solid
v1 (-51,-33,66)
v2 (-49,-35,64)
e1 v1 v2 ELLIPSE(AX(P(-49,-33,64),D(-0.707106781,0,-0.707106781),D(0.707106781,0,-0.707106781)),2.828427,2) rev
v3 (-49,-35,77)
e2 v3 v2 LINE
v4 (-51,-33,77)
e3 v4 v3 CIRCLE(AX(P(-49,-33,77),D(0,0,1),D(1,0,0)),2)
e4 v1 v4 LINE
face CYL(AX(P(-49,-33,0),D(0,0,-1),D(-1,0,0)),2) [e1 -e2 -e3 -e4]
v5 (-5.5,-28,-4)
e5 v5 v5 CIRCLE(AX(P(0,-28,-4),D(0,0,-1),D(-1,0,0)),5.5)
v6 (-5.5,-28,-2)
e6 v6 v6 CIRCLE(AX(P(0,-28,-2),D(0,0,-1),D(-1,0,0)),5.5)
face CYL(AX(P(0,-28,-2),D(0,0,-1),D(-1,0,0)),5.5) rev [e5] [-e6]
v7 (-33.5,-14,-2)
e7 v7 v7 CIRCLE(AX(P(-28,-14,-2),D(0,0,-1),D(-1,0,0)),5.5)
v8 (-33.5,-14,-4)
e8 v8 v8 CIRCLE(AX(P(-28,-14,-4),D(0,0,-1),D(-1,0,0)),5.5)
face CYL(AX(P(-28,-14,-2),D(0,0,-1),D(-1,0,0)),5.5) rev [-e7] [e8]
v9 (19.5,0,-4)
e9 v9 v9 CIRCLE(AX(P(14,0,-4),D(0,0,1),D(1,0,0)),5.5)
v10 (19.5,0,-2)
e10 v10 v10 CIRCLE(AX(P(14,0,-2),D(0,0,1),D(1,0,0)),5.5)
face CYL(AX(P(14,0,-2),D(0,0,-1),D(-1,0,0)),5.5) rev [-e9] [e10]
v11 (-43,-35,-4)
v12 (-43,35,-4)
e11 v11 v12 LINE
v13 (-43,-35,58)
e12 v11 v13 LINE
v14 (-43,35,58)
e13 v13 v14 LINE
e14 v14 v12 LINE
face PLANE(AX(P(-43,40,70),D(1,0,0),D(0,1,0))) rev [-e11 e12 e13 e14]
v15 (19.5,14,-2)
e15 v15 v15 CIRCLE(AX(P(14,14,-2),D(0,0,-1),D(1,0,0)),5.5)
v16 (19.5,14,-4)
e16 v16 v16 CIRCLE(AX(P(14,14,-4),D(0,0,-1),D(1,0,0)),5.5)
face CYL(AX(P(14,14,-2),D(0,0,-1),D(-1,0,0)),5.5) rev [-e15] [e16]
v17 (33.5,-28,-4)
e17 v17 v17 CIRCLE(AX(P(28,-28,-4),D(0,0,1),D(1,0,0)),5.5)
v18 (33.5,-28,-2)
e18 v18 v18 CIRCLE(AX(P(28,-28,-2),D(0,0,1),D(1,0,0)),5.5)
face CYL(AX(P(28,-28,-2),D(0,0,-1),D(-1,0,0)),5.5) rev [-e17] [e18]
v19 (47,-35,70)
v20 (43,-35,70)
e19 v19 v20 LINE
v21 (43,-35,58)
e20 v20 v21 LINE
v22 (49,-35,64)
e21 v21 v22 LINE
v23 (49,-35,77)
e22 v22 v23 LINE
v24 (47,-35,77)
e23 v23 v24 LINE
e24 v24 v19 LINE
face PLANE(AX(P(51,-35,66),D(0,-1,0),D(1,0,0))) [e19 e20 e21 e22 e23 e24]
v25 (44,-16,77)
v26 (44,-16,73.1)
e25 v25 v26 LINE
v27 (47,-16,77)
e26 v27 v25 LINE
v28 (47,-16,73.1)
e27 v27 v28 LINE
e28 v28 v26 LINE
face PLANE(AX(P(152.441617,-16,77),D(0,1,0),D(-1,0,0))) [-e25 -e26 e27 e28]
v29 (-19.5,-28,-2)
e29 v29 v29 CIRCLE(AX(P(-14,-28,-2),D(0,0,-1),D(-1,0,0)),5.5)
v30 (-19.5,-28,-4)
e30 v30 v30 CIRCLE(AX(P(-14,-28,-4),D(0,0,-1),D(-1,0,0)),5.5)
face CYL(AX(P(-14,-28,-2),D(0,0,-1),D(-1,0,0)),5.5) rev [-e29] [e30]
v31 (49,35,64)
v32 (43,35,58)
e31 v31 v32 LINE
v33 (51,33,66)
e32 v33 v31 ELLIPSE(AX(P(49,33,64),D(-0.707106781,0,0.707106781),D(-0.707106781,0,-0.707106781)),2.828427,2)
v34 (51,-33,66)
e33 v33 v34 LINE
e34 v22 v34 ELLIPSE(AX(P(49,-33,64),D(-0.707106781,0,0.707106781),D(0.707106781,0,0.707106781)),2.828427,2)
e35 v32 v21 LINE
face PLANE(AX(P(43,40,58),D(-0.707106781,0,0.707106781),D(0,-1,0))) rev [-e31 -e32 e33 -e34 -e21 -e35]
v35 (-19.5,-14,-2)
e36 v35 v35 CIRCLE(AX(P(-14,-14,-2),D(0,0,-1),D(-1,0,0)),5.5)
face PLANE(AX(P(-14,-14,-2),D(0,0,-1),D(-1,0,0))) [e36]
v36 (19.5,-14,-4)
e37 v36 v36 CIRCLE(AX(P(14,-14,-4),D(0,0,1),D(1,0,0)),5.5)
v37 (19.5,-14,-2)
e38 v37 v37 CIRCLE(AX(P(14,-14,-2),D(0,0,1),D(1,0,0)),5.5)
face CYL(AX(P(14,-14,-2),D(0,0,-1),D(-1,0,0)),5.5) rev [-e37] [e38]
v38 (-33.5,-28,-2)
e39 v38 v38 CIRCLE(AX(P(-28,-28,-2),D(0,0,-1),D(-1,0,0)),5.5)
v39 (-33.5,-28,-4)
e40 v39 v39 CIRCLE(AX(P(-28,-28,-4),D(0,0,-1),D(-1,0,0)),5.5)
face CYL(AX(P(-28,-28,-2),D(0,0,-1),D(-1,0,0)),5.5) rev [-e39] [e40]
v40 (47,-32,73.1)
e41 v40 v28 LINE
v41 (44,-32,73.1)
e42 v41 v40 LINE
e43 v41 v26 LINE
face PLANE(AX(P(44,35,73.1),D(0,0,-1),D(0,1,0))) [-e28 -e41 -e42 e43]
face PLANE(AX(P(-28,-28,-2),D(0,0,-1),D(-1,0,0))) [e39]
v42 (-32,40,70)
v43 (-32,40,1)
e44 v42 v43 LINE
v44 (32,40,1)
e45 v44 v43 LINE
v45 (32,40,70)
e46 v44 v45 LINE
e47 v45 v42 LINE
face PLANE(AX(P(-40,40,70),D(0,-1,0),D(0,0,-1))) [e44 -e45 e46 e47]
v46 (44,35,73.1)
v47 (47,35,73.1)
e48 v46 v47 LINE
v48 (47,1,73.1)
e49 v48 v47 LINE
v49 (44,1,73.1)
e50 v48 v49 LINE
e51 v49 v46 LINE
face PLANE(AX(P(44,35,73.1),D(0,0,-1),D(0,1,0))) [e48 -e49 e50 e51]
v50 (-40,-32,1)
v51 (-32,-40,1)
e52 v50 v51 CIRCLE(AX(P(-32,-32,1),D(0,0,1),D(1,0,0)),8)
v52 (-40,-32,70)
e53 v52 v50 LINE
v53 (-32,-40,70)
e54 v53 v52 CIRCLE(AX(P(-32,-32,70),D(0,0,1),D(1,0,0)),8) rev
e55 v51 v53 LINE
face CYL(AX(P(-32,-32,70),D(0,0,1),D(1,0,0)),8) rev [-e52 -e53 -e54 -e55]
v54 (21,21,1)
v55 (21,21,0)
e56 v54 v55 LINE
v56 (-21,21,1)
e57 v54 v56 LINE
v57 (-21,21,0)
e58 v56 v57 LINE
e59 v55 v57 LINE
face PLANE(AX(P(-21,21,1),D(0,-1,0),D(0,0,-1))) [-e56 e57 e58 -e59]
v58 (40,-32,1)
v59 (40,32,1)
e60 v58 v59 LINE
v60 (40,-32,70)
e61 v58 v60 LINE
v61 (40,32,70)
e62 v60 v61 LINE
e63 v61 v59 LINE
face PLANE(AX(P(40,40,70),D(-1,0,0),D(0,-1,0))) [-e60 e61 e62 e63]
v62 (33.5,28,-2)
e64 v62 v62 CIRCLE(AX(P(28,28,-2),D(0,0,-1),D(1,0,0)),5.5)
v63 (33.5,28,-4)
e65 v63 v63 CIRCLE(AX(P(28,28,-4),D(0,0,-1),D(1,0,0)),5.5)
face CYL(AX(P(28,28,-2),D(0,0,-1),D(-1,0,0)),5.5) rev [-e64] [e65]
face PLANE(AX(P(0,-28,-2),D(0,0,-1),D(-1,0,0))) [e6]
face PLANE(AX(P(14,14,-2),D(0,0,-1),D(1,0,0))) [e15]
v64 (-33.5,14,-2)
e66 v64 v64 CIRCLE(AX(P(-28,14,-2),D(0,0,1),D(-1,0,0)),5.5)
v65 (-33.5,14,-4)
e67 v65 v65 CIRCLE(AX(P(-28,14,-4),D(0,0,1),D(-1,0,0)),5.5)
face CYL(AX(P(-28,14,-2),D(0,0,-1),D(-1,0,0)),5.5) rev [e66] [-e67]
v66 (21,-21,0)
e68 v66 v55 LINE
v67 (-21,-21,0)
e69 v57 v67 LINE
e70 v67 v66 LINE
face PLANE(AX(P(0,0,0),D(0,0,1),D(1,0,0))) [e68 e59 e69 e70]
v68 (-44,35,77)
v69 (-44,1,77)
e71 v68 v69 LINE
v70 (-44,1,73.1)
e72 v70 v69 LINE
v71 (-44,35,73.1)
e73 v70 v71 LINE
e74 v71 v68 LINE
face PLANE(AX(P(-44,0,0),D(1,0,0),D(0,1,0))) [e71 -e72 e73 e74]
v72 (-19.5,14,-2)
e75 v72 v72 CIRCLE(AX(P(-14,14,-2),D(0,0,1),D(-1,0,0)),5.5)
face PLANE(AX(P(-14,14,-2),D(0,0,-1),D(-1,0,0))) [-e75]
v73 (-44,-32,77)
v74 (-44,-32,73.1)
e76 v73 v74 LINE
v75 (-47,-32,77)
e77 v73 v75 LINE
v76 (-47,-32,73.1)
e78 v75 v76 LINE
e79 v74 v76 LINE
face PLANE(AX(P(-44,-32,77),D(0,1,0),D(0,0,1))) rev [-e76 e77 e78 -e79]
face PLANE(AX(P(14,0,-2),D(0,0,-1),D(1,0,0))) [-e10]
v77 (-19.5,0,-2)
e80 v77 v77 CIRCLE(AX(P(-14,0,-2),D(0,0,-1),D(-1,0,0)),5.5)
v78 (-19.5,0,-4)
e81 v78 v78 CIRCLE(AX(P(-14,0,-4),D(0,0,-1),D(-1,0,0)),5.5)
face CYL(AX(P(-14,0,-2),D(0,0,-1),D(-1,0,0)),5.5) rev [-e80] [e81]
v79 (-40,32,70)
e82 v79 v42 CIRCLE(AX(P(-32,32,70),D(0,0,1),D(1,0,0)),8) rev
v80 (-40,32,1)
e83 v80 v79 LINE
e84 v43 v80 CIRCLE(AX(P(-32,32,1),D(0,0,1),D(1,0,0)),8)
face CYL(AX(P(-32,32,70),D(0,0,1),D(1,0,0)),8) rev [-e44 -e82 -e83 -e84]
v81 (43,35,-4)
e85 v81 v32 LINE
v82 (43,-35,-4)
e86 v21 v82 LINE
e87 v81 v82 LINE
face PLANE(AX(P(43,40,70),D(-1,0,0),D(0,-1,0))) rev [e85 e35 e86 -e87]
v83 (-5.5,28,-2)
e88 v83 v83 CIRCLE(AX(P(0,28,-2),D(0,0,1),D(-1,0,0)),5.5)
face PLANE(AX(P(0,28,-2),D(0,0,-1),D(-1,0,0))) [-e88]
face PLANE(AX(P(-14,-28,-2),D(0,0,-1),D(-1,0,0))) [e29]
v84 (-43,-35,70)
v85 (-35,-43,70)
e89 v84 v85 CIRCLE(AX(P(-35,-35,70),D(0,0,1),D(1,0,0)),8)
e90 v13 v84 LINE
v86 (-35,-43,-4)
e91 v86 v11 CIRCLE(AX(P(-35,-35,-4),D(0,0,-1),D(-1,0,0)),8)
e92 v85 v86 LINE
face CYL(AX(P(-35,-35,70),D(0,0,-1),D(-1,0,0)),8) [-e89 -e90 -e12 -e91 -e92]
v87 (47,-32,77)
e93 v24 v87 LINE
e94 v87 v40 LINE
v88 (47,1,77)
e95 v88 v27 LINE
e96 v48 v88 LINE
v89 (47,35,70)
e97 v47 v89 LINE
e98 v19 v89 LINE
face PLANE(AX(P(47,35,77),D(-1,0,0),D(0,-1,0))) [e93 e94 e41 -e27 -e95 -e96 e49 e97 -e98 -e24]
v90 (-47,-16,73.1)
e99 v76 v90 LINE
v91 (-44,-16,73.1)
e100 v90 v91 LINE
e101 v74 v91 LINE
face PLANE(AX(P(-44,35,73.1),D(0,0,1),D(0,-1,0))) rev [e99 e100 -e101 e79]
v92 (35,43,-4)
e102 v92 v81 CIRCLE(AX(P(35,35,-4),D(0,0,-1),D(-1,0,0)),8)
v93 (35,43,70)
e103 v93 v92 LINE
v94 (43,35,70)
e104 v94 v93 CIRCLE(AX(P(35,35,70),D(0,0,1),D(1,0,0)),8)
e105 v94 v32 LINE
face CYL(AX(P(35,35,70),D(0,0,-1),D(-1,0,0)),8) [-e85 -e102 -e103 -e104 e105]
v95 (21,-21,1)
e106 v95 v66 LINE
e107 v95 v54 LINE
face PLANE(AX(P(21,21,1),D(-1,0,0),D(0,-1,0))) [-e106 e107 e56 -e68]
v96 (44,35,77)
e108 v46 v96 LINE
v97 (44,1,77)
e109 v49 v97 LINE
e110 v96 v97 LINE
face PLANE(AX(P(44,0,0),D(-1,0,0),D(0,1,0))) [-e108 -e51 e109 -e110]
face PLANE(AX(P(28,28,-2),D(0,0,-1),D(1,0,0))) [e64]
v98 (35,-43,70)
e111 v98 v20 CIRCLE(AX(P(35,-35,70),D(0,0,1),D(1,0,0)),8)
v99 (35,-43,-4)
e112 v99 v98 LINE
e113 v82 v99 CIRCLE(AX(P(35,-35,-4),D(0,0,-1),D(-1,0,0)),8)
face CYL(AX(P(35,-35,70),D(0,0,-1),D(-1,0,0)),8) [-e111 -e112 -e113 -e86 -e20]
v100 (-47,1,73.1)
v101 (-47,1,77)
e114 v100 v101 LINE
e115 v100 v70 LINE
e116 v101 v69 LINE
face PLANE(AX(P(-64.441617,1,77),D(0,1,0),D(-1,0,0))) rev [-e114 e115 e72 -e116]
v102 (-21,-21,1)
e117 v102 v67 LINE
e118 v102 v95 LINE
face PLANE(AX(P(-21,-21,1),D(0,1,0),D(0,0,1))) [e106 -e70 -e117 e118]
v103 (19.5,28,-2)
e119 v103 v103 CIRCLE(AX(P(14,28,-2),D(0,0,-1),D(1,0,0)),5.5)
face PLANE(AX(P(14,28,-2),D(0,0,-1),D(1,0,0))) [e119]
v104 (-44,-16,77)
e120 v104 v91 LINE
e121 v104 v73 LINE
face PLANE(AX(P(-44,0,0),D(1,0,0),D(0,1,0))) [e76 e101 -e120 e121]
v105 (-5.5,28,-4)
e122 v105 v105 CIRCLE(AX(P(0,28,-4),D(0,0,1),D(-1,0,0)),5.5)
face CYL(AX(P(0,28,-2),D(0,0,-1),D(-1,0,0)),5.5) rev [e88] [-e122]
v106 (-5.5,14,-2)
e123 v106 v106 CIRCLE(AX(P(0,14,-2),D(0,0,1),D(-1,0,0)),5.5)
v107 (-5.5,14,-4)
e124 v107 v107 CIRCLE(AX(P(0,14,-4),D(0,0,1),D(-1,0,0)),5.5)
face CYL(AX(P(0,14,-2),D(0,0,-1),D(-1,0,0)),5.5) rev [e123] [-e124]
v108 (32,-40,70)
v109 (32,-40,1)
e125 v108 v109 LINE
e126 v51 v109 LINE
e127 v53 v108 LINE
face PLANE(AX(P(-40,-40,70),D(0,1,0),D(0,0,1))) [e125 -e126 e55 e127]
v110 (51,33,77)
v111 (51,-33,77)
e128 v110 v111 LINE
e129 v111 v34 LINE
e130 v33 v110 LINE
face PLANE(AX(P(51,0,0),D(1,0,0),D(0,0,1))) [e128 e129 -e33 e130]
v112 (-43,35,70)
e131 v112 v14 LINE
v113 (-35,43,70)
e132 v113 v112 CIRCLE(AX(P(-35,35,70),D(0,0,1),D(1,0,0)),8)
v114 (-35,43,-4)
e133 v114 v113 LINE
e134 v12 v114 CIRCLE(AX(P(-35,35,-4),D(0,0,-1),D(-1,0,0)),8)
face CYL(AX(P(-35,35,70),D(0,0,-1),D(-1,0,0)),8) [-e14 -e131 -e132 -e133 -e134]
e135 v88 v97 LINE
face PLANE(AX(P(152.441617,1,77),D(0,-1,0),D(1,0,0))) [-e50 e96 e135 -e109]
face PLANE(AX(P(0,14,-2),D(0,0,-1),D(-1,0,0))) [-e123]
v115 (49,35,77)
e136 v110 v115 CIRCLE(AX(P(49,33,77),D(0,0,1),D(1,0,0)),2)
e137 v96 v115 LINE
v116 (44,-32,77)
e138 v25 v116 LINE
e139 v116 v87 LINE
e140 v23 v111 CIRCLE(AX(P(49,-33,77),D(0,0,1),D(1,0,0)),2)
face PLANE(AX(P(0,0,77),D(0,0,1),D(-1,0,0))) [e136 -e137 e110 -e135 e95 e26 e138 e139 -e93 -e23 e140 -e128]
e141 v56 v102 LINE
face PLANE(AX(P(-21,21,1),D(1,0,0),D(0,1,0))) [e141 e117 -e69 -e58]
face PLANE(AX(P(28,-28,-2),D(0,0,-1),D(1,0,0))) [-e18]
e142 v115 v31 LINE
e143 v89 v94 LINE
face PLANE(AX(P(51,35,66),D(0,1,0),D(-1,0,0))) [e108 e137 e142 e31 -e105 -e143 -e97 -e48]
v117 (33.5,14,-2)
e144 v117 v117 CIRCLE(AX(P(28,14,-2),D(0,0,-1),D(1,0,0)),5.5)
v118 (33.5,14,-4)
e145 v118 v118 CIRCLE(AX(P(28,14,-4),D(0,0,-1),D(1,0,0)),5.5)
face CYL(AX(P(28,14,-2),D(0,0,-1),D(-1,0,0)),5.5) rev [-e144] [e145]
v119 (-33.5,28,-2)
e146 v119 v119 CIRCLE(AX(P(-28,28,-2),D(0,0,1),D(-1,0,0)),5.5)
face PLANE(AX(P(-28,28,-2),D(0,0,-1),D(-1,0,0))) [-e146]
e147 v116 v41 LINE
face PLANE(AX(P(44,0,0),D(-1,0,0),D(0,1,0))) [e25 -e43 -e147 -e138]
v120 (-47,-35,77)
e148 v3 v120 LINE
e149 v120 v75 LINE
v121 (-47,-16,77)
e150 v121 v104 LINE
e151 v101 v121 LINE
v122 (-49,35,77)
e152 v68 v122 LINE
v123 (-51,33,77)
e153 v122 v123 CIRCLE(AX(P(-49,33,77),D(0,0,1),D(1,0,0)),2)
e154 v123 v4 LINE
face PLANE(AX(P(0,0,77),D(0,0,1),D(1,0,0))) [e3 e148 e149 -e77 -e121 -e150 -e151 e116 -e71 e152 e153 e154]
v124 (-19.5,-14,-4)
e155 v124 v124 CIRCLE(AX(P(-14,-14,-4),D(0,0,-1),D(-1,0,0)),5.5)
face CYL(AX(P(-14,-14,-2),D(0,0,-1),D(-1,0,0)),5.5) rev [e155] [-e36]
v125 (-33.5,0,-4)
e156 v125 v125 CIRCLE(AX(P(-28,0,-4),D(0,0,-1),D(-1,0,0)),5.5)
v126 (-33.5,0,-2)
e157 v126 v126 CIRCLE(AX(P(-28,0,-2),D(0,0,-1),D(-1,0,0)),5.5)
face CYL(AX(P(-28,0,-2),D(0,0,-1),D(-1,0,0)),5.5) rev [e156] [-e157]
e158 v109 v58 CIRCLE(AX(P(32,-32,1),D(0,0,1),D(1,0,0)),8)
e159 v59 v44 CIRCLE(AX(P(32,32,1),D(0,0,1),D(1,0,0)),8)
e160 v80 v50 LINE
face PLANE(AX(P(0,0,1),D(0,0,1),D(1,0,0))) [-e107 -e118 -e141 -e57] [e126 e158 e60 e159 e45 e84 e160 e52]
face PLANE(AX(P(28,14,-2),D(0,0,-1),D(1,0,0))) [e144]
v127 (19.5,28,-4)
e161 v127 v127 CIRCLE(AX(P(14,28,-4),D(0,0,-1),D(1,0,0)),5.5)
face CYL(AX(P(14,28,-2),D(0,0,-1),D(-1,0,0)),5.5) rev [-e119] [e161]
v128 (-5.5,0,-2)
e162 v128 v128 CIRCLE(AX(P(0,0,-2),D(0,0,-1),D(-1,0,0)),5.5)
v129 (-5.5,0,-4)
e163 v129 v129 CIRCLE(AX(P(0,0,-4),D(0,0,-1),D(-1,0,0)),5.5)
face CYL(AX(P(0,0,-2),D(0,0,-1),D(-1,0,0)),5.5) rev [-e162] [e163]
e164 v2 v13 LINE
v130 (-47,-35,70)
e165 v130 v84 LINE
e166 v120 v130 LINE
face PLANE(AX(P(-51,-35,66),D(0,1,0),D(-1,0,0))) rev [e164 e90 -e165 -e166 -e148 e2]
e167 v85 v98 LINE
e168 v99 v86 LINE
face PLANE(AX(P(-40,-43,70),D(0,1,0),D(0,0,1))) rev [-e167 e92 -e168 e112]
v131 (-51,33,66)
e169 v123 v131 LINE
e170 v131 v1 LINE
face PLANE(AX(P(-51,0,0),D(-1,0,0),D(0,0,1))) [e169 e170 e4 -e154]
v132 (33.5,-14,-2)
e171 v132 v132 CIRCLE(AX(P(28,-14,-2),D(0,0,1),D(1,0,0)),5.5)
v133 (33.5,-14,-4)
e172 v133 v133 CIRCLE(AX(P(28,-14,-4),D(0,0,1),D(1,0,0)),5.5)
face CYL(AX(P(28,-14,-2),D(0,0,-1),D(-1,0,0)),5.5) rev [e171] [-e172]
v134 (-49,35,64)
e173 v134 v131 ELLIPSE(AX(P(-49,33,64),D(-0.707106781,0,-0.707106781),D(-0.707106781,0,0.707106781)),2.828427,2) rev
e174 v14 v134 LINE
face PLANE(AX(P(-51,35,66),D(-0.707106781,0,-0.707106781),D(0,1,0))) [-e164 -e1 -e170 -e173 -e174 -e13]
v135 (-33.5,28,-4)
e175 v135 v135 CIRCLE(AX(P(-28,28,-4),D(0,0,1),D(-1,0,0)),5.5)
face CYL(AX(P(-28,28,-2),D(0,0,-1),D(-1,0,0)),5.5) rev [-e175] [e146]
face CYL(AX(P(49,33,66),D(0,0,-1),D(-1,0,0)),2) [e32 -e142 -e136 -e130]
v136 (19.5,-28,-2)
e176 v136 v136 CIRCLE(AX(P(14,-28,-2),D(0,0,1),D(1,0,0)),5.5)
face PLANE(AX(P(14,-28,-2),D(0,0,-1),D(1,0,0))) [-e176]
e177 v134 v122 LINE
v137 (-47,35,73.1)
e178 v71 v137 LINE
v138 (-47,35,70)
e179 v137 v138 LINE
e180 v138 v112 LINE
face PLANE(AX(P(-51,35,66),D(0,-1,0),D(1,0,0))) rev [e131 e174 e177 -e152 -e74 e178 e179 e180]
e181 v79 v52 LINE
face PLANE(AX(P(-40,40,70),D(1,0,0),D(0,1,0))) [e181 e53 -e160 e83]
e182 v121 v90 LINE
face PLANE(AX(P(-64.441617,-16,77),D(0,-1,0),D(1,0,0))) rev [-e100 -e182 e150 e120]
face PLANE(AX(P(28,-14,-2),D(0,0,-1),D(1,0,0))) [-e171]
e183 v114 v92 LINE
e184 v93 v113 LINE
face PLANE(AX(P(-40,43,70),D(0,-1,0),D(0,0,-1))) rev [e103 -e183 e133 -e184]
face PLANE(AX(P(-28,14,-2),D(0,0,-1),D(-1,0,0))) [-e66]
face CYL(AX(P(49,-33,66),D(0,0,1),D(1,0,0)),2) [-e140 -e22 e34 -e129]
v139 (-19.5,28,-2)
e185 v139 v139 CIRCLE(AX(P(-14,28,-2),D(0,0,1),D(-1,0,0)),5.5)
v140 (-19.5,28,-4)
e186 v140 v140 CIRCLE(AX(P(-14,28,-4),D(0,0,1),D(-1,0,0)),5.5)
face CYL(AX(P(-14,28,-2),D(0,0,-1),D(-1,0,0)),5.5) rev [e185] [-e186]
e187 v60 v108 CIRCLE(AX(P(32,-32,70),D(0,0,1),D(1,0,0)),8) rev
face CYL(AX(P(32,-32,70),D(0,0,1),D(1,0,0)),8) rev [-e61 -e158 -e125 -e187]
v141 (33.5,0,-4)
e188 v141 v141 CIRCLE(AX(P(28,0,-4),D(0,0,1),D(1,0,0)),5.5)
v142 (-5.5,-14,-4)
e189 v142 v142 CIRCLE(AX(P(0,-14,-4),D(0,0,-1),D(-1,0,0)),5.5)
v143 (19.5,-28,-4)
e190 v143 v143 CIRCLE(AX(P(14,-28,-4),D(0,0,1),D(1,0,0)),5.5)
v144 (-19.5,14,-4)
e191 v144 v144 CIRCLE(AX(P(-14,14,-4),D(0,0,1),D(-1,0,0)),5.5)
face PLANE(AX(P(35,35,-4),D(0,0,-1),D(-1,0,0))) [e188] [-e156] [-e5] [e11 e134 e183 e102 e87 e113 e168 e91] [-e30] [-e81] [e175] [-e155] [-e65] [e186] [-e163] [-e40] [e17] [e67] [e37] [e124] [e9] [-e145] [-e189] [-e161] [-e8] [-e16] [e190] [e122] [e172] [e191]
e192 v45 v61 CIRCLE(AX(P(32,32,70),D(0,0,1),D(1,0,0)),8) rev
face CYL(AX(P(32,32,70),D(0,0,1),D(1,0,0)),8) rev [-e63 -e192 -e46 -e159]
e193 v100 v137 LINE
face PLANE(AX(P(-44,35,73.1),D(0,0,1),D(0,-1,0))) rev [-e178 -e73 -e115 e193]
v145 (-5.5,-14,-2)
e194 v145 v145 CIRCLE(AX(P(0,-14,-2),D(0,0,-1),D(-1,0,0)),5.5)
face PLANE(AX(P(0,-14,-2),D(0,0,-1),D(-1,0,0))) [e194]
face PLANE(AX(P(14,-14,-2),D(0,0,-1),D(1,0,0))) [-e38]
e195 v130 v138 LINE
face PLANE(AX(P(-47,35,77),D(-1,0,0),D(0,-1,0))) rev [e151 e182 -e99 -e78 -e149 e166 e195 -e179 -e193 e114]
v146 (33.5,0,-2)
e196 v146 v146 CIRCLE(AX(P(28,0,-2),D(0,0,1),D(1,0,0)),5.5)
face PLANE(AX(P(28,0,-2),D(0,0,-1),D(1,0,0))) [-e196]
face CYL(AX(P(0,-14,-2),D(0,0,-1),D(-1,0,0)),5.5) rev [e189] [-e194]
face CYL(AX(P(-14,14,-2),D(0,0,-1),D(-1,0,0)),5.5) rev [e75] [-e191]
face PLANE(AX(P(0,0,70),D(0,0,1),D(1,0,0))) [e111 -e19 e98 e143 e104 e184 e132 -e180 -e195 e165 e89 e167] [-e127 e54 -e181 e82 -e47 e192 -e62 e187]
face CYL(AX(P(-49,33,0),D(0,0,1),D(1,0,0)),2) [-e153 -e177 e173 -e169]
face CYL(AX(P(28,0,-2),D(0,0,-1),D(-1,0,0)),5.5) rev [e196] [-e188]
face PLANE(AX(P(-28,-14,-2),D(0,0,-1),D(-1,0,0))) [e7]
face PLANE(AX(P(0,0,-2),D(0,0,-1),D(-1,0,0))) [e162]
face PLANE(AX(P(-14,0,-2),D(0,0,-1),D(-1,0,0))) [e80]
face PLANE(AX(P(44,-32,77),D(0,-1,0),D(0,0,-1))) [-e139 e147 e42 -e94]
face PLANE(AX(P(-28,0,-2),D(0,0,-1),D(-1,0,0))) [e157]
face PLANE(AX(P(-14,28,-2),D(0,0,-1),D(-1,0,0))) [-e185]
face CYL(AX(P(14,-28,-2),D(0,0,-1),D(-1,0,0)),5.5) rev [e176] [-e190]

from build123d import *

# Parameters (mm, degrees)
SKETCH_1_W                  = 80
SKETCH_1_H                  = 80
EXTRUDE_1_DEPTH             = 70
SHELL_1_T                   = 3
SKETCH_2_W                  = 80
SKETCH_2_H                  = 80
SKETCH_2_W_2                = 42
SKETCH_2_H_2                = 42
EXTRUDE_2_DEPTH             = 1
FILLET_1_R                  = 8
SKETCH_3_W                  = 4
SKETCH_3_H                  = 70
EXTRUDE_3_DEPTH             = 8
SKETCH_4_W                  = 4
SKETCH_4_H                  = 70
EXTRUDE_4_DEPTH             = 7
SKETCH_5_W                  = 3.9
SKETCH_5_H                  = 67
EXTRUDE_5_DEPTH             = 3
SKETCH_8_W                  = 3.9
SKETCH_8_H                  = 17
CUT_EXTRUDE_2_DEPTH         = 3
FILLET_2_R                  = 2
CHAMFER_START               = -35
CHAMFER_1_DEPTH             = 70
CHAMFER_START_2             = 63
CHAMFER_1_2_DEPTH           = 3
EXTRUDE_START               = 1
EXTRUDE_6_DEPTH             = 1
SKETCH_7_R                  = 5.5
CUT_EXTRUDE_1_DEPTH         = 2
PATTERN_LINEAR_1_COUNT      = 3
PATTERN_LINEAR_1_PITCH      = 14
PATTERN_LINEAR_1_COUNT_DIR2 = 3
PATTERN_LINEAR_1_PITCH_DIR2 = 14
MIRROR_2_COPY_1_SKETCH_R    = 5.5
MIRROR_2_COPY_1_DEPTH       = 2
MIRROR_2_COPY_2_SKETCH_R    = 5.5
MIRROR_2_COPY_2_DEPTH       = 2
MIRROR_2_COPY_3_SKETCH_R    = 5.5
MIRROR_2_COPY_3_DEPTH       = 2
MIRROR_2_COPY_4_SKETCH_R    = 5.5
MIRROR_2_COPY_4_DEPTH       = 2
MIRROR_2_COPY_5_SKETCH_R    = 5.5
MIRROR_2_COPY_5_DEPTH       = 2
MIRROR_2_COPY_6_SKETCH_R    = 5.5
MIRROR_2_COPY_6_DEPTH       = 2
MIRROR_2_COPY_7_SKETCH_R    = 5.5
MIRROR_2_COPY_7_DEPTH       = 2
MIRROR_2_COPY_8_SKETCH_R    = 5.5
MIRROR_2_COPY_8_DEPTH       = 2
MIRROR_2_COPY_9_SKETCH_R    = 5.5
MIRROR_2_COPY_9_DEPTH       = 2
MIRROR_3_COPY_1_SKETCH_R    = 5.5
MIRROR_3_COPY_1_DEPTH       = 2
MIRROR_3_COPY_2_SKETCH_R    = 5.5
MIRROR_3_COPY_2_DEPTH       = 2
MIRROR_3_COPY_3_SKETCH_R    = 5.5
MIRROR_3_COPY_3_DEPTH       = 2
MIRROR_3_COPY_4_SKETCH_R    = 5.5
MIRROR_3_COPY_4_DEPTH       = 2
MIRROR_3_COPY_5_SKETCH_R    = 5.5
MIRROR_3_COPY_5_DEPTH       = 2
MIRROR_3_COPY_6_SKETCH_R    = 5.5
MIRROR_3_COPY_6_DEPTH       = 2
MIRROR_3_COPY_7_SKETCH_R    = 5.5
MIRROR_3_COPY_7_DEPTH       = 2
MIRROR_3_COPY_8_SKETCH_R    = 5.5
MIRROR_3_COPY_8_DEPTH       = 2
MIRROR_3_COPY_9_SKETCH_R    = 5.5
MIRROR_3_COPY_9_DEPTH       = 2
MIRROR_3_COPY_10_SKETCH_R   = 5.5
MIRROR_3_COPY_10_DEPTH      = 2
MIRROR_3_COPY_11_SKETCH_R   = 5.5
MIRROR_3_COPY_11_DEPTH      = 2
MIRROR_3_COPY_12_SKETCH_R   = 5.5
MIRROR_3_COPY_12_DEPTH      = 2
MIRROR_3_COPY_13_SKETCH_R   = 5.5
MIRROR_3_COPY_13_DEPTH      = 2
MIRROR_3_COPY_14_SKETCH_R   = 5.5
MIRROR_3_COPY_14_DEPTH      = 2
MIRROR_3_COPY_15_SKETCH_R   = 5.5
MIRROR_3_COPY_15_DEPTH      = 2
MIRROR_3_COPY_16_SKETCH_R   = 5.5
MIRROR_3_COPY_16_DEPTH      = 2
MIRROR_3_COPY_17_SKETCH_R   = 5.5
MIRROR_3_COPY_17_DEPTH      = 2
MIRROR_3_COPY_18_SKETCH_R   = 5.5
MIRROR_3_COPY_18_DEPTH      = 2
MIRROR_3_COPY_19_SKETCH_R   = 5.5
MIRROR_3_COPY_19_DEPTH      = 2


with BuildPart() as part:
    # 草图1 → 凸台-拉伸1 (new body)
    with BuildSketch(Plane.XY):
        Rectangle(SKETCH_1_W, SKETCH_1_H)
    extrude(amount=EXTRUDE_1_DEPTH)

    # 抽壳1
    shell_1_openings = [part.faces().sort_by_distance(p)[0] for p in [
        (0, 0, 70),
    ]]
    offset(amount=SHELL_1_T, openings=shell_1_openings, kind=Kind.INTERSECTION)

    # 草图2 → 凸台-拉伸2 (add)
    with BuildSketch(Plane.XY):
        Rectangle(SKETCH_2_W, SKETCH_2_H)
        Rectangle(SKETCH_2_W_2, SKETCH_2_H_2, mode=Mode.SUBTRACT)
    extrude(amount=EXTRUDE_2_DEPTH)

    # 圆角1
    fillet_1_edges = [part.edges().sort_by_distance(p)[0] for p in [
        (40, -40, 35.5),
        (40, 40, 35.5),
        (-40, 40, 35.5),
        (-40, -40, 35.5),
        (43, -43, 33.5),
        (-43, -43, 33.5),
        (-43, 43, 33.5),
        (43, 43, 33.5),
    ]]
    fillet(fillet_1_edges, radius=FILLET_1_R)

    # 草图3 → 凸台-拉伸3 (add)
    with BuildSketch(Plane.ZY.offset(43)):
        with Locations((68, 0)):
            Rectangle(SKETCH_3_W, SKETCH_3_H)
    extrude_3 = extrude(amount=EXTRUDE_3_DEPTH)

    # 草图4 → 凸台-拉伸4 (add)
    with BuildSketch(Plane.XY.offset(70)):
        with Locations((-49, 0)):
            Rectangle(SKETCH_4_W, SKETCH_4_H)
    extrude_4 = extrude(amount=EXTRUDE_4_DEPTH)

    # 草图5 → 凸台-拉伸5 (add)
    with BuildSketch(Plane(origin=(-47, 0, 0), x_dir=(0, 0, -1), z_dir=(1, 0, 0))):
        with Locations((-75.05, 1.5)):
            Rectangle(SKETCH_5_W, SKETCH_5_H)
    extrude_5 = extrude(amount=EXTRUDE_5_DEPTH)

    # 草图8 → 切除-拉伸2 (cut)
    with BuildSketch(Plane(origin=(-44, 0, 0), x_dir=(0, 0, -1), z_dir=(1, 0, 0))):
        with Locations((-75.05, -7.5)):
            Rectangle(SKETCH_8_W, SKETCH_8_H)
    cut_extrude_2 = extrude(amount=-CUT_EXTRUDE_2_DEPTH, mode=Mode.SUBTRACT)

    # 镜向1: 凸台-拉伸3, 凸台-拉伸4, 凸台-拉伸5, 切除-拉伸2 across plane
    add(extrude_3.mirror(Plane(origin=(0, 0, 0), x_dir=(0, 0, 1), z_dir=(1, 0, 0))))
    add(extrude_4.mirror(Plane(origin=(0, 0, 0), x_dir=(0, 0, 1), z_dir=(1, 0, 0))))
    add(extrude_5.mirror(Plane(origin=(0, 0, 0), x_dir=(0, 0, 1), z_dir=(1, 0, 0))))
    add(cut_extrude_2.mirror(Plane(origin=(0, 0, 0), x_dir=(0, 0, 1), z_dir=(1, 0, 0))), mode=Mode.SUBTRACT)

    # 圆角2
    fillet_2_edges = [part.edges().sort_by_distance(p)[0] for p in [
        (-51, -35, 71.5),
        (-51, 35, 71.5),
        (51, 35, 71.5),
        (51, -35, 71.5),
    ]]
    fillet(fillet_2_edges, radius=FILLET_2_R)

    # 倒角1: read off the stored shape, not the designer's step
    # 倒角1 outline → 倒角1 (add)
    with BuildSketch(Plane(origin=(0, 0, 0), x_dir=(1, 0, 0), z_dir=(0, 1, 0)).offset(CHAMFER_START)):
        Polygon((51, -66), (43, -58), (43, -66), align=None)
        Polygon((-43, -66), (-43, -58), (-51, -66), align=None)
    extrude(amount=CHAMFER_1_DEPTH)

    # Chamfer 1 2 outline → Chamfer 1 2 (cut)
    with BuildSketch(Plane.XY.offset(CHAMFER_START_2)):
        with BuildLine():
            Line((51.000000043, 35.000000063), (49, 35))
            ThreePointArc((49, 35), (50.414213562, 34.414213562), (51, 33))
            Line((51, 33), (51.000000043, 35.000000063))
        make_face()
        with BuildLine():
            ThreePointArc((-51, 33), (-50.414213562, 34.414213562), (-49, 35))
            Line((-49, 35), (-51.000000043, 35.000000063))
            Line((-51.000000043, 35.000000063), (-51, 33))
        make_face()
        with BuildLine():
            Line((51.000000043, -35.000000063), (51, -33))
            ThreePointArc((51, -33), (50.414213562, -34.414213562), (49, -35))
            Line((49, -35), (51.000000043, -35.000000063))
        make_face()
        with BuildLine():
            ThreePointArc((-49, -35), (-50.414213562, -34.414213562), (-51, -33))
            Line((-51, -33), (-51.000000043, -35.000000063))
            Line((-51.000000043, -35.000000063), (-49, -35))
        make_face()
    extrude(amount=CHAMFER_1_2_DEPTH, mode=Mode.SUBTRACT)

    # 草图6 → 凸台-拉伸6 (add)
    with BuildSketch(Plane(origin=(0, 0, -3), x_dir=(-1, 0, 0), z_dir=(0, 0, -1)).offset(EXTRUDE_START)):
        with BuildLine():
            Line((-43, 35), (-43, -35))
            ThreePointArc((-43, -35), (-40.656854249, -40.656854249), (-35, -43))
            Line((-35, -43), (35, -43))
            ThreePointArc((35, -43), (40.656854249, -40.656854249), (43, -35))
            Line((43, -35), (43, 35))
            ThreePointArc((43, 35), (40.656854249, 40.656854249), (35, 43))
            Line((35, 43), (-35, 43))
            ThreePointArc((-35, 43), (-40.656854249, 40.656854249), (-43, 35))
        make_face()
    extrude(amount=-EXTRUDE_6_DEPTH)

    # 草图7 → 切除-拉伸1 (cut)
    with BuildSketch(Plane(origin=(0, 0, -4), x_dir=(-1, 0, 0), z_dir=(0, 0, -1))):
        Circle(SKETCH_7_R)
    cut_extrude_1 = extrude(amount=-CUT_EXTRUDE_1_DEPTH, mode=Mode.SUBTRACT)

    # 阵列(线性)1: Cut-Extrude 1 3 × 3
    with Locations(*[(-i * PATTERN_LINEAR_1_PITCH, -j * PATTERN_LINEAR_1_PITCH_DIR2, 0) for i in range(PATTERN_LINEAR_1_COUNT) for j in range(PATTERN_LINEAR_1_COUNT_DIR2) if (i, j) != (0, 0)]):
        add(cut_extrude_1, mode=Mode.SUBTRACT)

    # 镜向2 copy 1 sketch → 镜向2 copy 1 (cut)
    with BuildSketch(Plane(origin=(0, 14, -4), x_dir=(-1, 0, 0), z_dir=(0, 0, -1))):
        Circle(MIRROR_2_COPY_1_SKETCH_R)
    extrude(amount=-MIRROR_2_COPY_1_DEPTH, mode=Mode.SUBTRACT)

    # 镜向2 copy 2 sketch → 镜向2 copy 2 (cut)
    with BuildSketch(Plane(origin=(0, 28, -4), x_dir=(-1, 0, 0), z_dir=(0, 0, -1))):
        Circle(MIRROR_2_COPY_2_SKETCH_R)
    extrude(amount=-MIRROR_2_COPY_2_DEPTH, mode=Mode.SUBTRACT)

    # 镜向2 copy 3 sketch → 镜向2 copy 3 (cut)
    with BuildSketch(Plane(origin=(-14, 0, -4), x_dir=(-1, 0, 0), z_dir=(0, 0, -1))):
        Circle(MIRROR_2_COPY_3_SKETCH_R)
    extrude(amount=-MIRROR_2_COPY_3_DEPTH, mode=Mode.SUBTRACT)

    # 镜向2 copy 4 sketch → 镜向2 copy 4 (cut)
    with BuildSketch(Plane(origin=(-14, 14, -4), x_dir=(-1, 0, 0), z_dir=(0, 0, -1))):
        Circle(MIRROR_2_COPY_4_SKETCH_R)
    extrude(amount=-MIRROR_2_COPY_4_DEPTH, mode=Mode.SUBTRACT)

    # 镜向2 copy 5 sketch → 镜向2 copy 5 (cut)
    with BuildSketch(Plane(origin=(-14, 28, -4), x_dir=(-1, 0, 0), z_dir=(0, 0, -1))):
        Circle(MIRROR_2_COPY_5_SKETCH_R)
    extrude(amount=-MIRROR_2_COPY_5_DEPTH, mode=Mode.SUBTRACT)

    # 镜向2 copy 6 sketch → 镜向2 copy 6 (cut)
    with BuildSketch(Plane(origin=(-28, 0, -4), x_dir=(-1, 0, 0), z_dir=(0, 0, -1))):
        Circle(MIRROR_2_COPY_6_SKETCH_R)
    extrude(amount=-MIRROR_2_COPY_6_DEPTH, mode=Mode.SUBTRACT)

    # 镜向2 copy 7 sketch → 镜向2 copy 7 (cut)
    with BuildSketch(Plane(origin=(-28, 14, -4), x_dir=(-1, 0, 0), z_dir=(0, 0, -1))):
        Circle(MIRROR_2_COPY_7_SKETCH_R)
    extrude(amount=-MIRROR_2_COPY_7_DEPTH, mode=Mode.SUBTRACT)

    # 镜向2 copy 8 sketch → 镜向2 copy 8 (cut)
    with BuildSketch(Plane(origin=(-28, 28, -4), x_dir=(-1, 0, 0), z_dir=(0, 0, -1))):
        Circle(MIRROR_2_COPY_8_SKETCH_R)
    extrude(amount=-MIRROR_2_COPY_8_DEPTH, mode=Mode.SUBTRACT)

    # 镜向2 copy 9 sketch → 镜向2 copy 9 (cut)
    with BuildSketch(Plane(origin=(0, 0, -4), x_dir=(-1, 0, 0), z_dir=(0, 0, -1))):
        Circle(MIRROR_2_COPY_9_SKETCH_R)
    extrude(amount=-MIRROR_2_COPY_9_DEPTH, mode=Mode.SUBTRACT)

    # 镜向3 copy 1 sketch → 镜向3 copy 1 (cut)
    with BuildSketch(Plane(origin=(0, -14, -4), x_dir=(1, 0, 0), z_dir=(0, 0, -1))):
        Circle(MIRROR_3_COPY_1_SKETCH_R)
    extrude(amount=-MIRROR_3_COPY_1_DEPTH, mode=Mode.SUBTRACT)

    # 镜向3 copy 2 sketch → 镜向3 copy 2 (cut)
    with BuildSketch(Plane(origin=(0, -28, -4), x_dir=(1, 0, 0), z_dir=(0, 0, -1))):
        Circle(MIRROR_3_COPY_2_SKETCH_R)
    extrude(amount=-MIRROR_3_COPY_2_DEPTH, mode=Mode.SUBTRACT)

    # 镜向3 copy 3 sketch → 镜向3 copy 3 (cut)
    with BuildSketch(Plane(origin=(14, 0, -4), x_dir=(1, 0, 0), z_dir=(0, 0, -1))):
        Circle(MIRROR_3_COPY_3_SKETCH_R)
    extrude(amount=-MIRROR_3_COPY_3_DEPTH, mode=Mode.SUBTRACT)

    # 镜向3 copy 4 sketch → 镜向3 copy 4 (cut)
    with BuildSketch(Plane(origin=(14, -14, -4), x_dir=(1, 0, 0), z_dir=(0, 0, -1))):
        Circle(MIRROR_3_COPY_4_SKETCH_R)
    extrude(amount=-MIRROR_3_COPY_4_DEPTH, mode=Mode.SUBTRACT)

    # 镜向3 copy 5 sketch → 镜向3 copy 5 (cut)
    with BuildSketch(Plane(origin=(14, -28, -4), x_dir=(1, 0, 0), z_dir=(0, 0, -1))):
        Circle(MIRROR_3_COPY_5_SKETCH_R)
    extrude(amount=-MIRROR_3_COPY_5_DEPTH, mode=Mode.SUBTRACT)

    # 镜向3 copy 6 sketch → 镜向3 copy 6 (cut)
    with BuildSketch(Plane(origin=(28, 0, -4), x_dir=(1, 0, 0), z_dir=(0, 0, -1))):
        Circle(MIRROR_3_COPY_6_SKETCH_R)
    extrude(amount=-MIRROR_3_COPY_6_DEPTH, mode=Mode.SUBTRACT)

    # 镜向3 copy 7 sketch → 镜向3 copy 7 (cut)
    with BuildSketch(Plane(origin=(28, -14, -4), x_dir=(1, 0, 0), z_dir=(0, 0, -1))):
        Circle(MIRROR_3_COPY_7_SKETCH_R)
    extrude(amount=-MIRROR_3_COPY_7_DEPTH, mode=Mode.SUBTRACT)

    # 镜向3 copy 8 sketch → 镜向3 copy 8 (cut)
    with BuildSketch(Plane(origin=(28, -28, -4), x_dir=(1, 0, 0), z_dir=(0, 0, -1))):
        Circle(MIRROR_3_COPY_8_SKETCH_R)
    extrude(amount=-MIRROR_3_COPY_8_DEPTH, mode=Mode.SUBTRACT)

    # 镜向3 copy 9 sketch → 镜向3 copy 9 (cut)
    with BuildSketch(Plane(origin=(0, 0, -4), x_dir=(1, 0, 0), z_dir=(0, 0, -1))):
        Circle(MIRROR_3_COPY_9_SKETCH_R)
    extrude(amount=-MIRROR_3_COPY_9_DEPTH, mode=Mode.SUBTRACT)

    # 镜向3 copy 10 sketch → 镜向3 copy 10 (cut)
    with BuildSketch(Plane(origin=(0, 14, -4), x_dir=(1, 0, 0), z_dir=(0, 0, -1))):
        Circle(MIRROR_3_COPY_10_SKETCH_R)
    extrude(amount=-MIRROR_3_COPY_10_DEPTH, mode=Mode.SUBTRACT)

    # 镜向3 copy 11 sketch → 镜向3 copy 11 (cut)
    with BuildSketch(Plane(origin=(0, 28, -4), x_dir=(1, 0, 0), z_dir=(0, 0, -1))):
        Circle(MIRROR_3_COPY_11_SKETCH_R)
    extrude(amount=-MIRROR_3_COPY_11_DEPTH, mode=Mode.SUBTRACT)

    # 镜向3 copy 12 sketch → 镜向3 copy 12 (cut)
    with BuildSketch(Plane(origin=(14, 0, -4), x_dir=(1, 0, 0), z_dir=(0, 0, -1))):
        Circle(MIRROR_3_COPY_12_SKETCH_R)
    extrude(amount=-MIRROR_3_COPY_12_DEPTH, mode=Mode.SUBTRACT)

    # 镜向3 copy 13 sketch → 镜向3 copy 13 (cut)
    with BuildSketch(Plane(origin=(14, 14, -4), x_dir=(1, 0, 0), z_dir=(0, 0, -1))):
        Circle(MIRROR_3_COPY_13_SKETCH_R)
    extrude(amount=-MIRROR_3_COPY_13_DEPTH, mode=Mode.SUBTRACT)

    # 镜向3 copy 14 sketch → 镜向3 copy 14 (cut)
    with BuildSketch(Plane(origin=(14, 28, -4), x_dir=(1, 0, 0), z_dir=(0, 0, -1))):
        Circle(MIRROR_3_COPY_14_SKETCH_R)
    extrude(amount=-MIRROR_3_COPY_14_DEPTH, mode=Mode.SUBTRACT)

    # 镜向3 copy 15 sketch → 镜向3 copy 15 (cut)
    with BuildSketch(Plane(origin=(28, 0, -4), x_dir=(1, 0, 0), z_dir=(0, 0, -1))):
        Circle(MIRROR_3_COPY_15_SKETCH_R)
    extrude(amount=-MIRROR_3_COPY_15_DEPTH, mode=Mode.SUBTRACT)

    # 镜向3 copy 16 sketch → 镜向3 copy 16 (cut)
    with BuildSketch(Plane(origin=(28, 14, -4), x_dir=(1, 0, 0), z_dir=(0, 0, -1))):
        Circle(MIRROR_3_COPY_16_SKETCH_R)
    extrude(amount=-MIRROR_3_COPY_16_DEPTH, mode=Mode.SUBTRACT)

    # 镜向3 copy 17 sketch → 镜向3 copy 17 (cut)
    with BuildSketch(Plane(origin=(28, 28, -4), x_dir=(1, 0, 0), z_dir=(0, 0, -1))):
        Circle(MIRROR_3_COPY_17_SKETCH_R)
    extrude(amount=-MIRROR_3_COPY_17_DEPTH, mode=Mode.SUBTRACT)

    # 镜向3 copy 18 sketch → 镜向3 copy 18 (cut)
    with BuildSketch(Plane(origin=(0, 0, -4), x_dir=(1, 0, 0), z_dir=(0, 0, -1))):
        Circle(MIRROR_3_COPY_18_SKETCH_R)
    extrude(amount=-MIRROR_3_COPY_18_DEPTH, mode=Mode.SUBTRACT)

    # 镜向3 copy 19 sketch → 镜向3 copy 19 (cut)
    with BuildSketch(Plane(origin=(0, 0, -4), x_dir=(1, 0, 0), z_dir=(0, 0, -1))):
        Circle(MIRROR_3_COPY_19_SKETCH_R)
    extrude(amount=-MIRROR_3_COPY_19_DEPTH, mode=Mode.SUBTRACT)


solid = part.part
